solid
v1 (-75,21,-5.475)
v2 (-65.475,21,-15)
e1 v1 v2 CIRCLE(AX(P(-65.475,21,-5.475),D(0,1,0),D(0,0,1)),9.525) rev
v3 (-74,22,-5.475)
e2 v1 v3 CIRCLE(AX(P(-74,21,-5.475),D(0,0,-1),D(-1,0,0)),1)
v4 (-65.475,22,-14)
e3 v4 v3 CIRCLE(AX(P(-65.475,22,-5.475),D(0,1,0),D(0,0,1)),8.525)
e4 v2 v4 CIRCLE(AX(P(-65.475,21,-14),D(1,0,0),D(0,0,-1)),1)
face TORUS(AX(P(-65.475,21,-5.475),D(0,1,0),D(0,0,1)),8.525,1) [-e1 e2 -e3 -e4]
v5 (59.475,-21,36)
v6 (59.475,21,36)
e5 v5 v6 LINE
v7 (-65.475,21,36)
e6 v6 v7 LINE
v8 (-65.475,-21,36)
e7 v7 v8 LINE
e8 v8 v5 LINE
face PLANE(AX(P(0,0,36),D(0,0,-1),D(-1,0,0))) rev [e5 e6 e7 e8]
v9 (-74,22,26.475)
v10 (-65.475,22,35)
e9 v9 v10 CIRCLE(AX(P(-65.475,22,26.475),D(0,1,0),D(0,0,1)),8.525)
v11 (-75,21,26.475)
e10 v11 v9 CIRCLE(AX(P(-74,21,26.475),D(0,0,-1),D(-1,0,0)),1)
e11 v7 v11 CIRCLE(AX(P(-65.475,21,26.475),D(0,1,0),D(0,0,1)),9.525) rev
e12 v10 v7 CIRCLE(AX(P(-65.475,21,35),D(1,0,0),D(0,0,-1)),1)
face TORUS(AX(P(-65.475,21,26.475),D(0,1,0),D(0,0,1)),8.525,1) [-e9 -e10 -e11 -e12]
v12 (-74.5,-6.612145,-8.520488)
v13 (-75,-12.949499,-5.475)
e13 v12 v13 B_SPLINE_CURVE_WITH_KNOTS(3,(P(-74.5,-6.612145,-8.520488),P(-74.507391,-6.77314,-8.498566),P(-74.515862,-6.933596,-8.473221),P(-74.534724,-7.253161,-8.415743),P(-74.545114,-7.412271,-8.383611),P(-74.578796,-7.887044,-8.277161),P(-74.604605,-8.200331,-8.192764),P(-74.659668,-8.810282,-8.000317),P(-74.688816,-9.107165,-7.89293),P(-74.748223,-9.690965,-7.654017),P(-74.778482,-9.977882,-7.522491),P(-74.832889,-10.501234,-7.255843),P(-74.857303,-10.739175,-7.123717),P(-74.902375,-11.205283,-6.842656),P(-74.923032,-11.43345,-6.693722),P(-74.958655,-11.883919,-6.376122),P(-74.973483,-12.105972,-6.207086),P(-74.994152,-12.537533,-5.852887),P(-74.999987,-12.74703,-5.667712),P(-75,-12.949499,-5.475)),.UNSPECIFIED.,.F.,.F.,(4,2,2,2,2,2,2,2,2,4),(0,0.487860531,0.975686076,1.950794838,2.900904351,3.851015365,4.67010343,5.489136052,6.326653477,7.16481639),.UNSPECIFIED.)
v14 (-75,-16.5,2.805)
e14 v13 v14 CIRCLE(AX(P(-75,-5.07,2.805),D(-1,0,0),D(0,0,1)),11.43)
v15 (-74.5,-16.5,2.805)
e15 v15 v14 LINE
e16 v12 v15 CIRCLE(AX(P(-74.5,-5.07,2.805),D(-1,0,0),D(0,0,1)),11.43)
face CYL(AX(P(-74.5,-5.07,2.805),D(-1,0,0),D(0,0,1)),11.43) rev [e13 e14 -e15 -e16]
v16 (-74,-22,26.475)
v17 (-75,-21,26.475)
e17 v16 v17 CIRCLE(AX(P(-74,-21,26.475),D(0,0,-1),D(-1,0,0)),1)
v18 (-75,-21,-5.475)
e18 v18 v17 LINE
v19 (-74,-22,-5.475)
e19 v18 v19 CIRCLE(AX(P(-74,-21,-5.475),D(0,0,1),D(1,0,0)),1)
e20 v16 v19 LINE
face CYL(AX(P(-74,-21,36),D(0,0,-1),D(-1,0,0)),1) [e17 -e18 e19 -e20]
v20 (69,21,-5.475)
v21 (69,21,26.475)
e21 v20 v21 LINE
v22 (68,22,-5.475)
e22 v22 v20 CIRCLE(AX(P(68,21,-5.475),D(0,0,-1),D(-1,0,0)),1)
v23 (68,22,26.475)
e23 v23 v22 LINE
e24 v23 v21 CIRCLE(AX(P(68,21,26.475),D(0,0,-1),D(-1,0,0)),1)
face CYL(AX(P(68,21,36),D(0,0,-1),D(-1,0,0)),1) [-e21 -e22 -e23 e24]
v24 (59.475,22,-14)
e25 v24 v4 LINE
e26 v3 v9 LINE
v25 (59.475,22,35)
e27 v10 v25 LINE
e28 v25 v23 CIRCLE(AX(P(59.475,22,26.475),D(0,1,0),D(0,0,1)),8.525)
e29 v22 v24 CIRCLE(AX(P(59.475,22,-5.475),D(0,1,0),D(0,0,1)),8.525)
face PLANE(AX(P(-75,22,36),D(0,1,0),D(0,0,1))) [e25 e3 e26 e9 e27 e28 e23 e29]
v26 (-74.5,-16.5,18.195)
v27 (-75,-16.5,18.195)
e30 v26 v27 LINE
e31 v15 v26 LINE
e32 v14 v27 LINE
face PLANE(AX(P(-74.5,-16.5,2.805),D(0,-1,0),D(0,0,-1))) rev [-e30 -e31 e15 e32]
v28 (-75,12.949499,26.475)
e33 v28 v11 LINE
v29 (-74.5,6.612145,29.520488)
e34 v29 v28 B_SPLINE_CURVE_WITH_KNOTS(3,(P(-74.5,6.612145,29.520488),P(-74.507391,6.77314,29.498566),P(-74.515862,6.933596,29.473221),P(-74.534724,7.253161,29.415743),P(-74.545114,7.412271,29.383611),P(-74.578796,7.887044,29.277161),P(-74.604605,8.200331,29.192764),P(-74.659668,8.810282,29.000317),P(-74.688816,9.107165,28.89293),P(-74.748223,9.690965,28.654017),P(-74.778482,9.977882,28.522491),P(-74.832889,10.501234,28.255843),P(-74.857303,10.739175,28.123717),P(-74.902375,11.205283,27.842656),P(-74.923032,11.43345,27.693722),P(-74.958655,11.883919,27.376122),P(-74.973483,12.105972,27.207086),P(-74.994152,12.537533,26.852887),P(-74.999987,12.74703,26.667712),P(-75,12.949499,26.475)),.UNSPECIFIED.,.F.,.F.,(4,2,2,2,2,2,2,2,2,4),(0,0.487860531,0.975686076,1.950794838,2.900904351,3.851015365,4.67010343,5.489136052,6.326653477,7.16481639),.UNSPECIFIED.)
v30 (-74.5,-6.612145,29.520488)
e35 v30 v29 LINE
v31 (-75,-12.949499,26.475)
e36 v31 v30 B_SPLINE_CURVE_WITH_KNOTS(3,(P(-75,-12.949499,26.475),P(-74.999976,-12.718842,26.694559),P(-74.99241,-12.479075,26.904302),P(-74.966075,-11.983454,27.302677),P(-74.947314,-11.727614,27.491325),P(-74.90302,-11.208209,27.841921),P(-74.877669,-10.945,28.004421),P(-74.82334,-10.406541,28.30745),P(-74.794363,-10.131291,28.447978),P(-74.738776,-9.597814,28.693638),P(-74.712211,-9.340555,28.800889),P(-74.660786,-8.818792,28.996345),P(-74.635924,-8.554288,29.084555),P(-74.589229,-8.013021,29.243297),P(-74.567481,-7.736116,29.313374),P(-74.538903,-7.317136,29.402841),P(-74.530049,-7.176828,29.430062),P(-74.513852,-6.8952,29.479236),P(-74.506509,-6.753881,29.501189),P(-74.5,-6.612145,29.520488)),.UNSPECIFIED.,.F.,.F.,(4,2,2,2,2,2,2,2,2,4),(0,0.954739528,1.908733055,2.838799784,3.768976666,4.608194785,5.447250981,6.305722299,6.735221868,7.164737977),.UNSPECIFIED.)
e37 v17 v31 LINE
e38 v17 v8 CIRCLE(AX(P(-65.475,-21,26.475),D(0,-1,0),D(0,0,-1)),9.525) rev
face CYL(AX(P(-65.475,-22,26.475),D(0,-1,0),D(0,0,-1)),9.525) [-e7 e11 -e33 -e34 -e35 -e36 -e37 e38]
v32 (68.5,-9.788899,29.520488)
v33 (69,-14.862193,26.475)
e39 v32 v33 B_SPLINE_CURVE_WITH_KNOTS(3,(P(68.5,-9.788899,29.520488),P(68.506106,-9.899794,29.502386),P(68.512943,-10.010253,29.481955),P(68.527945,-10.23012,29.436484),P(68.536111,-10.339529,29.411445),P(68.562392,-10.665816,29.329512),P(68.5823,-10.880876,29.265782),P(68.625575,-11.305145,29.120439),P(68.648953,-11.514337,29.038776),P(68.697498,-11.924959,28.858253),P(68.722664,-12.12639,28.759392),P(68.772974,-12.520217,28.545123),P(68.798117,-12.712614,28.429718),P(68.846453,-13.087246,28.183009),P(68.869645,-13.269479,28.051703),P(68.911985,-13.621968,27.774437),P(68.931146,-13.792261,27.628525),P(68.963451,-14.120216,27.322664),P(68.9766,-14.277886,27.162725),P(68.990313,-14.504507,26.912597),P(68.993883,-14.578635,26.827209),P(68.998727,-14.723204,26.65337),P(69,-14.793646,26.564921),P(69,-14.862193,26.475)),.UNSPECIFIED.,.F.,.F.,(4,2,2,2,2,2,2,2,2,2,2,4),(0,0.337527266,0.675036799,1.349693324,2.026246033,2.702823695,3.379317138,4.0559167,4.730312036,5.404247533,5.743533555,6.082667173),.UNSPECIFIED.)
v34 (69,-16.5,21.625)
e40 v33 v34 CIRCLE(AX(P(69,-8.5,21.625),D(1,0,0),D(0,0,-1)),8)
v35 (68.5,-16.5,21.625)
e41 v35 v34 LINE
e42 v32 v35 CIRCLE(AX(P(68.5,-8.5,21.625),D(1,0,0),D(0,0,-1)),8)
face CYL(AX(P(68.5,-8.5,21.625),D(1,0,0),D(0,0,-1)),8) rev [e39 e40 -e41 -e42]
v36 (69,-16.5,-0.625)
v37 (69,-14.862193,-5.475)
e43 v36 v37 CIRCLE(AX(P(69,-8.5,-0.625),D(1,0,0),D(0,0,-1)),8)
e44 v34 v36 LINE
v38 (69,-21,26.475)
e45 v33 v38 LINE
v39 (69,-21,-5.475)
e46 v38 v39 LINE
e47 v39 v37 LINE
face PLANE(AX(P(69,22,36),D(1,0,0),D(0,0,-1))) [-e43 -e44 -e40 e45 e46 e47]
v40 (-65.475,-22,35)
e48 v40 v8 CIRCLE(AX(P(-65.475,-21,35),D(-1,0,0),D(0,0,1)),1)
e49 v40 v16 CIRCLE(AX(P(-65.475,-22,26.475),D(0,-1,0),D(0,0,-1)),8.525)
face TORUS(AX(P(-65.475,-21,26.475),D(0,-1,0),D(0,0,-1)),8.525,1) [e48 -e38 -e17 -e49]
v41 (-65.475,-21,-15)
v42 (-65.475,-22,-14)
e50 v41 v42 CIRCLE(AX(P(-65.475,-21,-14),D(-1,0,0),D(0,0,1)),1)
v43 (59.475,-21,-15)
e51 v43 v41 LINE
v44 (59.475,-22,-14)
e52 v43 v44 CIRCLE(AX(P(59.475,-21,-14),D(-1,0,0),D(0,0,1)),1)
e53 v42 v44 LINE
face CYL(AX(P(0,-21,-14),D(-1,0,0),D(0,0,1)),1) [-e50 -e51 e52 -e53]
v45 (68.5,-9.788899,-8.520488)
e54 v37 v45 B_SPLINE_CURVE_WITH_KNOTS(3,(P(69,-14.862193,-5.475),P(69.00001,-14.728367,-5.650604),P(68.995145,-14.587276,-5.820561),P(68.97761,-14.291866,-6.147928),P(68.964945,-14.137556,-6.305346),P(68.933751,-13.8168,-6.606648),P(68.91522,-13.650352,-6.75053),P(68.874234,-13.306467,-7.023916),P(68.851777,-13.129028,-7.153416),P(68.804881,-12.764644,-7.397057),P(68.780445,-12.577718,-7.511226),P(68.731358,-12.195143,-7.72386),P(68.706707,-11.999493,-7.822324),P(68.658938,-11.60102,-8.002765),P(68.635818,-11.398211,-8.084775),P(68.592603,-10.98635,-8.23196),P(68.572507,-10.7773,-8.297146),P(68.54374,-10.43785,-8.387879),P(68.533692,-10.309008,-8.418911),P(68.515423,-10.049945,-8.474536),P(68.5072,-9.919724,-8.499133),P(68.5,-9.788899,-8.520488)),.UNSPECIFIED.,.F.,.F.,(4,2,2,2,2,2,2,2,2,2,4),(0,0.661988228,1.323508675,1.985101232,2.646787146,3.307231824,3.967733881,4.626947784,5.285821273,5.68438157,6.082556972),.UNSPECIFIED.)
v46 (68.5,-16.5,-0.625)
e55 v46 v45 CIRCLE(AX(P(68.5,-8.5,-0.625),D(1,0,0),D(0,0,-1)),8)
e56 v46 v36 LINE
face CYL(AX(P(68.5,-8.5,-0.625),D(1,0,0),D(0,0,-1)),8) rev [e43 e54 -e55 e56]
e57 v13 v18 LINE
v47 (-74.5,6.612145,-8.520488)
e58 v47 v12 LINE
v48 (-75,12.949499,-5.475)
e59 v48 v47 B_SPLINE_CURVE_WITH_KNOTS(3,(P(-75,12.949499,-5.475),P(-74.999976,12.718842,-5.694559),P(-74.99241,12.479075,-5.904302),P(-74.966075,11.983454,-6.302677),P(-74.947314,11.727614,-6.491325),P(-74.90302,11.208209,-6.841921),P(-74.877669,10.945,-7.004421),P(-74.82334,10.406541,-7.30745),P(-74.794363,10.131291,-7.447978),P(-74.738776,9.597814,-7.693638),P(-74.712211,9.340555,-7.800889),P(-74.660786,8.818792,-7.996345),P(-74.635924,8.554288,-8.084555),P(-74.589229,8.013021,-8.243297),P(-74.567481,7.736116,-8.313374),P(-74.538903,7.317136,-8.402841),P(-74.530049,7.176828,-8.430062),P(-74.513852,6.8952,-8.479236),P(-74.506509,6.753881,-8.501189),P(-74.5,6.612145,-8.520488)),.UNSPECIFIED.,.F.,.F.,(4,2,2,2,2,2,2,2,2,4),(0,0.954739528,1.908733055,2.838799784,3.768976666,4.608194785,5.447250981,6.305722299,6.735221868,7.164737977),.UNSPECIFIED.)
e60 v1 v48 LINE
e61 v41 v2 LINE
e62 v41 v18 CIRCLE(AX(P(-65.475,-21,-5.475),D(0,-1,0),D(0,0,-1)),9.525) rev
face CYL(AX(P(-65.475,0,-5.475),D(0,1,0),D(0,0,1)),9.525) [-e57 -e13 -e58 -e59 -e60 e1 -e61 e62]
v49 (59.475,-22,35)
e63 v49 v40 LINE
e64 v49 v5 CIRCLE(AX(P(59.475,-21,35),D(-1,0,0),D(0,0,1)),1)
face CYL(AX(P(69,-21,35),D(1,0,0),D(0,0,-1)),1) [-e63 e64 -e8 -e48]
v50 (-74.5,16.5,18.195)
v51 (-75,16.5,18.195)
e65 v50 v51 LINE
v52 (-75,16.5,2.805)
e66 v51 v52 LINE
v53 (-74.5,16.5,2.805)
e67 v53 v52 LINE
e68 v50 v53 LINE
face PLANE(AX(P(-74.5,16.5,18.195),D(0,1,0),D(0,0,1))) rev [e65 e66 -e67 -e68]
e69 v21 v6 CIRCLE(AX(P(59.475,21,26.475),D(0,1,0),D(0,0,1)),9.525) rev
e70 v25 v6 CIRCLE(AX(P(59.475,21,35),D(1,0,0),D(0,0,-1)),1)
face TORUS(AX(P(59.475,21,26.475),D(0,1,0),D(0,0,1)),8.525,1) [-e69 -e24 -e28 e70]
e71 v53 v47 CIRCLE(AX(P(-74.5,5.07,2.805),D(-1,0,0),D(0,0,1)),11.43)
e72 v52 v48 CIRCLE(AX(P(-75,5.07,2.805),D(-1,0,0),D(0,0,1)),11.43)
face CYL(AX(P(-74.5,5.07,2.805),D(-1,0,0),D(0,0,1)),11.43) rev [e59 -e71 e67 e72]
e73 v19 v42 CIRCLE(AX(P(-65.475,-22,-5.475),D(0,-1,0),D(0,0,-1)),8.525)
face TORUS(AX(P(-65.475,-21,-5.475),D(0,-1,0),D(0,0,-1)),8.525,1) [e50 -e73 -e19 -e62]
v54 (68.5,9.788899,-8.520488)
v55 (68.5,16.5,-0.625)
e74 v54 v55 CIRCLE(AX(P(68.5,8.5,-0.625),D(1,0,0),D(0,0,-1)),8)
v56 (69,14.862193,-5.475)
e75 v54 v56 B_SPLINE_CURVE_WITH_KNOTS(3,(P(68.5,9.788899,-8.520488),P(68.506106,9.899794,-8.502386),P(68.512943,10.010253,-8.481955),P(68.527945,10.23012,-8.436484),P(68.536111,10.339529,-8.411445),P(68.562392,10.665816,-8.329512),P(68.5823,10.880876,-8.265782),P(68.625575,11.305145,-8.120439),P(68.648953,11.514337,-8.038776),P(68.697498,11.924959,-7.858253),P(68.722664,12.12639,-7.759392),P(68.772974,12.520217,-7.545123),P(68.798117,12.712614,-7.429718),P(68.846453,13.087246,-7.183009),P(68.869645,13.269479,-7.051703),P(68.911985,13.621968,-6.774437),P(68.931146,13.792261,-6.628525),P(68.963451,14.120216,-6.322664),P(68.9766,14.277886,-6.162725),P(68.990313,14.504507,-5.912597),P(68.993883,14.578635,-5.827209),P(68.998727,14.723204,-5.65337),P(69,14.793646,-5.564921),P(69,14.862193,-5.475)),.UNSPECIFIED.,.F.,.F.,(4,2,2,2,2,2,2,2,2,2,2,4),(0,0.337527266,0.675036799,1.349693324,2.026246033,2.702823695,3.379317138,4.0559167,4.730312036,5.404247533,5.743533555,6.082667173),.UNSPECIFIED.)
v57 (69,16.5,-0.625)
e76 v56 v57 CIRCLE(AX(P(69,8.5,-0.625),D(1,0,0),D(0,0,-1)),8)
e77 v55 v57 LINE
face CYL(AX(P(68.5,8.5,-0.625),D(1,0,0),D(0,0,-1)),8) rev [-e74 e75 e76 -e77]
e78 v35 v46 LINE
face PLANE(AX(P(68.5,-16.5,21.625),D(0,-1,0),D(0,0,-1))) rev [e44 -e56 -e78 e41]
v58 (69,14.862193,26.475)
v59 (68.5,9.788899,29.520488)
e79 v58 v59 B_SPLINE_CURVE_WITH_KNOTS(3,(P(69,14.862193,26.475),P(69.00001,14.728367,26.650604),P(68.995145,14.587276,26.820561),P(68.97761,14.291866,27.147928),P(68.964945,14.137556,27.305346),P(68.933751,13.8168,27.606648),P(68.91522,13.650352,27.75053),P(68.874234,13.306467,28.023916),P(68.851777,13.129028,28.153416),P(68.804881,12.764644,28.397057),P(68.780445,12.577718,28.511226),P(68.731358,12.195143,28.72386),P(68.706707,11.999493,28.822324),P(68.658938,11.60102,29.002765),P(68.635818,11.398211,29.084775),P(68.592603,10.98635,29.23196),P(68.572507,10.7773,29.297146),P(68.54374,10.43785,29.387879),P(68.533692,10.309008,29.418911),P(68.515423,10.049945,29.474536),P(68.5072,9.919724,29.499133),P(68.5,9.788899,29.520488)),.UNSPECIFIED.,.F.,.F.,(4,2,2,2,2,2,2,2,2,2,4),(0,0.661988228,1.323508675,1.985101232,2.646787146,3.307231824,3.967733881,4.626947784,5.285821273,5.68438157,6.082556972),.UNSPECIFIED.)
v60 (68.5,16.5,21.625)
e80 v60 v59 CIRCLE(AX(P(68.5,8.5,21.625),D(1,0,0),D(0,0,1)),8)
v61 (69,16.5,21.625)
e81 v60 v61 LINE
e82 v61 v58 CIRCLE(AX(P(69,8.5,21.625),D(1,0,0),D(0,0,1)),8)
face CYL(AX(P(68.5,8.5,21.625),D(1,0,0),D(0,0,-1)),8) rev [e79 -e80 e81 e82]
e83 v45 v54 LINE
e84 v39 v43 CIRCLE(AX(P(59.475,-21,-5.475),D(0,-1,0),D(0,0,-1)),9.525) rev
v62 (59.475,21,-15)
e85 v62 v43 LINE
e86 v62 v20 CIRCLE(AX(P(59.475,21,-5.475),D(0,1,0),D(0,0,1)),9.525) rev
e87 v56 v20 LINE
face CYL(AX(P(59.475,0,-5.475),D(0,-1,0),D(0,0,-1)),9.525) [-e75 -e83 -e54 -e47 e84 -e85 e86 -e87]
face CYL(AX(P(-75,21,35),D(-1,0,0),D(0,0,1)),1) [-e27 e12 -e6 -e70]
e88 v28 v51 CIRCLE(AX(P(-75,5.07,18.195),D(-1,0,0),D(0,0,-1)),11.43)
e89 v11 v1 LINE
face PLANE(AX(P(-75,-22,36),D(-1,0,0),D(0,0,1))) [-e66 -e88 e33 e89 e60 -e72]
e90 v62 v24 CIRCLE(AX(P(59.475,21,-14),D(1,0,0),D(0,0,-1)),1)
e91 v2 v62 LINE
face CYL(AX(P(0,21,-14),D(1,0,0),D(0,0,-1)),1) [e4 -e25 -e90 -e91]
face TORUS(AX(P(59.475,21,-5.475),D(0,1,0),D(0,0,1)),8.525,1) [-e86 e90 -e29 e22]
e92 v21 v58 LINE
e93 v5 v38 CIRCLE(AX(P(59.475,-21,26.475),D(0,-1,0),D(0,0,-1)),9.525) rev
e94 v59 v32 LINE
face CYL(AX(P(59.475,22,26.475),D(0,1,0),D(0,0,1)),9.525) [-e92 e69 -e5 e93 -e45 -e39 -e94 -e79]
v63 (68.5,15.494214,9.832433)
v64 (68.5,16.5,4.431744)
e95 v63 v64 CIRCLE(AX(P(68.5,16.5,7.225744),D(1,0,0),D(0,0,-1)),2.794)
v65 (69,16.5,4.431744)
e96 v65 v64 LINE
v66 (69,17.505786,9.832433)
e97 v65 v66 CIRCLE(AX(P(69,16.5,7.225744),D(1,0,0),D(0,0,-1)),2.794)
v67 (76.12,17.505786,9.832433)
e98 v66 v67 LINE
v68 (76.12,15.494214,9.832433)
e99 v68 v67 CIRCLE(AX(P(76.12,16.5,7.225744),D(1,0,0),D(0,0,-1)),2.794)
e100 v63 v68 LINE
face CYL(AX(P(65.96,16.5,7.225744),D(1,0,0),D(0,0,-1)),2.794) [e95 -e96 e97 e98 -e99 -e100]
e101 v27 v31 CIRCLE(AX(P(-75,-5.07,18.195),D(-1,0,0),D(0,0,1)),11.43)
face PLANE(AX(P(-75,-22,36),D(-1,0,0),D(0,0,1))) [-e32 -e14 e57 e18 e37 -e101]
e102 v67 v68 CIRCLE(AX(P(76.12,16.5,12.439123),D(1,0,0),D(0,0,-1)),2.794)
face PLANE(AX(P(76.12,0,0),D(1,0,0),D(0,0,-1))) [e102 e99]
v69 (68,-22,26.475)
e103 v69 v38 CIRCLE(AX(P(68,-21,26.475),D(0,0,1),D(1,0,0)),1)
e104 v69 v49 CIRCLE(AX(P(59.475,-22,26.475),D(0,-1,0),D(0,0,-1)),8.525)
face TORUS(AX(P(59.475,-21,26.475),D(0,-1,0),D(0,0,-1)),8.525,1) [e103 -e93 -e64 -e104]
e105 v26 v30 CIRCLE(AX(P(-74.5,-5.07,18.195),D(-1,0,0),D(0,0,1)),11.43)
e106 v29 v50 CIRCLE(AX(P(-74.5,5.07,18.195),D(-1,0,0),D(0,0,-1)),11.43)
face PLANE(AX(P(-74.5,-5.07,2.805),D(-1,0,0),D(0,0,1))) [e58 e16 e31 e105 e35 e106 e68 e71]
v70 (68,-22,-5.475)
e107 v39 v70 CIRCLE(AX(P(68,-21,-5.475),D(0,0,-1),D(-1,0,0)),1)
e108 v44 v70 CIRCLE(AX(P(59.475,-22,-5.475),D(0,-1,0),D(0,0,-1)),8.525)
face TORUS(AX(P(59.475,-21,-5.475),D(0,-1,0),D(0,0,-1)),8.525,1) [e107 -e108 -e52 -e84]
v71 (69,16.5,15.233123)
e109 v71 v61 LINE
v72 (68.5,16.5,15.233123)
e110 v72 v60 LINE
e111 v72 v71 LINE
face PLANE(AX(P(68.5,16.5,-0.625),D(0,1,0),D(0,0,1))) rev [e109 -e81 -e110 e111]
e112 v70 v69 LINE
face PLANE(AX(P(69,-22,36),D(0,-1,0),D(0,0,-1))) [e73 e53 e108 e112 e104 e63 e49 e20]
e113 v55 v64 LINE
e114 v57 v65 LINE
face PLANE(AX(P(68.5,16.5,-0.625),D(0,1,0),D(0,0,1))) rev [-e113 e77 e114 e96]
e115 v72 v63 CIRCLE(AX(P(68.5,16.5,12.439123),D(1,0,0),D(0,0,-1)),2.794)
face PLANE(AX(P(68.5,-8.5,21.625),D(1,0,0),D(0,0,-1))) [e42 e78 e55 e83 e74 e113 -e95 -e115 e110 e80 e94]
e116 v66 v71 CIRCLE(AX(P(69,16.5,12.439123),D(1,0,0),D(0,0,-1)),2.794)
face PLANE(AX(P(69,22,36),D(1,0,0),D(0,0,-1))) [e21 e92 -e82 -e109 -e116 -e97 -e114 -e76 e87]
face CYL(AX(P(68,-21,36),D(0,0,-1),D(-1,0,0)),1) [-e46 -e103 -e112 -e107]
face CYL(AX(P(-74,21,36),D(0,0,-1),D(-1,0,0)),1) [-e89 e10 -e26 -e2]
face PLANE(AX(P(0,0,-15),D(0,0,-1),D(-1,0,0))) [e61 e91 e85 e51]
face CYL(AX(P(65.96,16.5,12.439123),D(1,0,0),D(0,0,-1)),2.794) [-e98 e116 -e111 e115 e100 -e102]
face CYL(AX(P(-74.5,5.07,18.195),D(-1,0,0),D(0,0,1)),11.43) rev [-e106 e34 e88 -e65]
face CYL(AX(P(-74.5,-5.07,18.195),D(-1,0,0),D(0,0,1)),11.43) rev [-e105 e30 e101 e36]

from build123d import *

# Parameters (mm, degrees)
SKETCH1_W                = 144
SKETCH1_H                = 44
BOSS_EXTRUDE1_DEPTH      = 51
CUT_EXTRUDE1_DEPTH       = 0.5
CUT_EXTRUDE2_DEPTH       = 0.5
FILLET1_R                = 9.525
FILLET2_R                = 1
BOSS_EXTRUDE2_DEPTH      = 7.62
BOSS_EXTRUDE2_DEPTH_BACK = 2.54


with BuildPart() as part:
    # Sketch1 → Boss-Extrude1 (new body)
    with BuildSketch(Plane(origin=(0, 0, -15), x_dir=(-1, 0, 0), z_dir=(0, 0, -1))):
        with Locations((3, 0)):
            Rectangle(SKETCH1_W, SKETCH1_H)
    extrude(amount=-BOSS_EXTRUDE1_DEPTH)

    # Sketch2 → Cut-Extrude1 (cut)
    with BuildSketch(Plane(origin=(69, 0, 0), x_dir=(0, 0, -1), z_dir=(1, 0, 0))):
        with BuildLine():
            Line((-29.625, 8.5), (-29.625, -8.5))
            ThreePointArc((-29.625, -8.5), (-27.281854249, -14.156854249), (-21.625, -16.5))
            Line((-21.625, -16.5), (0.625, -16.5))
            ThreePointArc((0.625, -16.5), (6.281854249, -14.156854249), (8.625, -8.5))
            Line((8.625, -8.5), (8.625, 8.5))
            ThreePointArc((8.625, 8.5), (6.281854249, 14.156854249), (0.625, 16.5))
            Line((0.625, 16.5), (-21.625, 16.5))
            ThreePointArc((-21.625, 16.5), (-27.281854249, 14.156854249), (-29.625, 8.5))
        make_face()
    extrude(amount=-CUT_EXTRUDE1_DEPTH, mode=Mode.SUBTRACT)

    # Sketch3 → Cut-Extrude2 (cut)
    with BuildSketch(Plane.ZY.offset(75)):
        with BuildLine():
            Line((18.195, 16.5), (2.805, 16.5))
            ThreePointArc((2.805, 16.5), (-5.277230509, 13.152230509), (-8.625, 5.07))
            Line((-8.625, 5.07), (-8.625, -5.07))
            ThreePointArc((-8.625, -5.07), (-5.277230509, -13.152230509), (2.805, -16.5))
            Line((2.805, -16.5), (18.195, -16.5))
            ThreePointArc((18.195, -16.5), (26.277230509, -13.152230509), (29.625, -5.07))
            Line((29.625, -5.07), (29.625, 5.07))
            ThreePointArc((29.625, 5.07), (26.277230509, 13.152230509), (18.195, 16.5))
        make_face()
    extrude(amount=-CUT_EXTRUDE2_DEPTH, mode=Mode.SUBTRACT)

    # Fillet1
    # the kernel refuses this fillet: 9.525 mm, written as the material it takes off along each edge
    with BuildSketch(Plane(origin=(-75, -45.8125, -15), x_dir=(0, 0, 1), z_dir=(0, 1, 0)), Plane(origin=(69, 45.8125, -15), x_dir=(0, 0, 1), z_dir=(0, -1, 0))) as fillet1_piece_1:
        with BuildLine():
            CenterArc((FILLET1_R, FILLET1_R), FILLET1_R, 180, 90)
            Line((0, FILLET1_R), (0, 0))
            Line((0, 0), (FILLET1_R, 0))
        make_face()
    extrude(amount=91.625, mode=Mode.SUBTRACT)
    with BuildSketch(Plane(origin=(-75, -45.8125, 36), x_dir=(0, 0, -1), z_dir=(0, 1, 0)), Plane(origin=(69, 45.8125, 36), x_dir=(0, 0, -1), z_dir=(0, -1, 0))) as fillet1_piece_2:
        with BuildLine():
            CenterArc((FILLET1_R, -FILLET1_R), FILLET1_R, 90, 90)
            Line((0, -FILLET1_R), (0, 0))
            Line((0, 0), (FILLET1_R, 0))
        make_face()
    extrude(amount=91.625, mode=Mode.SUBTRACT)

    # Fillet2
    fillet2_edges = [part.edges().sort_by_distance(p)[0] for p in [
        (-3, -22, -15),
        (-3, 22, -15),
        (-75, 22, 10.5),
        (-3, 22, 36),
        (69, 22, 10.5),
        (66.210192091, 22, 33.210192091),
        (66.210192091, 22, -12.210192091),
        (-72.210192091, 22, 33.210192091),
        (-72.210192091, 22, -12.210192091),
        (-75, -22, 10.5),
        (69, -22, 10.5),
        (-3, -22, 36),
        (66.210192091, -22, 33.210192091),
        (66.210192091, -22, -12.210192091),
        (-72.210192091, -22, 33.210192091),
        (-72.210192091, -22, -12.210192091),
    ]]
    fillet(fillet2_edges, radius=FILLET2_R)

    # Sketch5 → Boss-Extrude2 (add, two sides: drawn at the far end of the back side and taken through both)
    with BuildSketch(Plane(origin=(68.5, 0, 0), x_dir=(0, 0, -1), z_dir=(1, 0, 0)).offset(-BOSS_EXTRUDE2_DEPTH_BACK)):
        with BuildLine():
            Line((-10.019743612, 16.5), (-9.645122715, 16.5))
            ThreePointArc((-9.645122715, 16.5), (-9.692349462, 17.011539536), (-9.832433164, 17.505786052))
            ThreePointArc((-9.832433164, 17.505786052), (-9.972516865, 17.011539536), (-10.019743612, 16.5))
        make_face()
        with BuildLine():
            Line((-4.431743612, 16.5), (-9.645122715, 16.5))
            ThreePointArc((-9.645122715, 16.5), (-9.692349462, 15.988460464), (-9.832433164, 15.494213948))
            ThreePointArc((-9.832433164, 15.494213948), (-6.714204076, 13.753226747), (-4.431743612, 16.5))
        make_face()
        with BuildLine():
            ThreePointArc((-9.832433164, 17.505786052), (-9.692349462, 17.011539536), (-9.645122715, 16.5))
            Line((-9.645122715, 16.5), (-4.431743612, 16.5))
            ThreePointArc((-4.431743612, 16.5), (-6.714204076, 19.246773253), (-9.832433164, 17.505786052))
        make_face()
        with BuildLine():
            ThreePointArc((-9.832433164, 15.494213948), (-9.692349462, 15.988460464), (-9.645122715, 16.5))
            Line((-9.645122715, 16.5), (-10.019743612, 16.5))
            ThreePointArc((-10.019743612, 16.5), (-9.972516865, 15.988460464), (-9.832433164, 15.494213948))
        make_face()
        with BuildLine():
            ThreePointArc((-10.019743612, 16.5), (-9.972516865, 17.011539536), (-9.832433164, 17.505786052))
            ThreePointArc((-9.832433164, 17.505786052), (-12.950662251, 19.246773253), (-15.233122715, 16.5))
            Line((-15.233122715, 16.5), (-10.019743612, 16.5))
        make_face()
        with BuildLine():
            ThreePointArc((-15.233122715, 16.5), (-12.950662251, 13.753226747), (-9.832433164, 15.494213948))
            ThreePointArc((-9.832433164, 15.494213948), (-9.972516865, 15.988460464), (-10.019743612, 16.5))
            Line((-10.019743612, 16.5), (-15.233122715, 16.5))
        make_face()
    extrude(amount=BOSS_EXTRUDE2_DEPTH + BOSS_EXTRUDE2_DEPTH_BACK)


solid = part.part
